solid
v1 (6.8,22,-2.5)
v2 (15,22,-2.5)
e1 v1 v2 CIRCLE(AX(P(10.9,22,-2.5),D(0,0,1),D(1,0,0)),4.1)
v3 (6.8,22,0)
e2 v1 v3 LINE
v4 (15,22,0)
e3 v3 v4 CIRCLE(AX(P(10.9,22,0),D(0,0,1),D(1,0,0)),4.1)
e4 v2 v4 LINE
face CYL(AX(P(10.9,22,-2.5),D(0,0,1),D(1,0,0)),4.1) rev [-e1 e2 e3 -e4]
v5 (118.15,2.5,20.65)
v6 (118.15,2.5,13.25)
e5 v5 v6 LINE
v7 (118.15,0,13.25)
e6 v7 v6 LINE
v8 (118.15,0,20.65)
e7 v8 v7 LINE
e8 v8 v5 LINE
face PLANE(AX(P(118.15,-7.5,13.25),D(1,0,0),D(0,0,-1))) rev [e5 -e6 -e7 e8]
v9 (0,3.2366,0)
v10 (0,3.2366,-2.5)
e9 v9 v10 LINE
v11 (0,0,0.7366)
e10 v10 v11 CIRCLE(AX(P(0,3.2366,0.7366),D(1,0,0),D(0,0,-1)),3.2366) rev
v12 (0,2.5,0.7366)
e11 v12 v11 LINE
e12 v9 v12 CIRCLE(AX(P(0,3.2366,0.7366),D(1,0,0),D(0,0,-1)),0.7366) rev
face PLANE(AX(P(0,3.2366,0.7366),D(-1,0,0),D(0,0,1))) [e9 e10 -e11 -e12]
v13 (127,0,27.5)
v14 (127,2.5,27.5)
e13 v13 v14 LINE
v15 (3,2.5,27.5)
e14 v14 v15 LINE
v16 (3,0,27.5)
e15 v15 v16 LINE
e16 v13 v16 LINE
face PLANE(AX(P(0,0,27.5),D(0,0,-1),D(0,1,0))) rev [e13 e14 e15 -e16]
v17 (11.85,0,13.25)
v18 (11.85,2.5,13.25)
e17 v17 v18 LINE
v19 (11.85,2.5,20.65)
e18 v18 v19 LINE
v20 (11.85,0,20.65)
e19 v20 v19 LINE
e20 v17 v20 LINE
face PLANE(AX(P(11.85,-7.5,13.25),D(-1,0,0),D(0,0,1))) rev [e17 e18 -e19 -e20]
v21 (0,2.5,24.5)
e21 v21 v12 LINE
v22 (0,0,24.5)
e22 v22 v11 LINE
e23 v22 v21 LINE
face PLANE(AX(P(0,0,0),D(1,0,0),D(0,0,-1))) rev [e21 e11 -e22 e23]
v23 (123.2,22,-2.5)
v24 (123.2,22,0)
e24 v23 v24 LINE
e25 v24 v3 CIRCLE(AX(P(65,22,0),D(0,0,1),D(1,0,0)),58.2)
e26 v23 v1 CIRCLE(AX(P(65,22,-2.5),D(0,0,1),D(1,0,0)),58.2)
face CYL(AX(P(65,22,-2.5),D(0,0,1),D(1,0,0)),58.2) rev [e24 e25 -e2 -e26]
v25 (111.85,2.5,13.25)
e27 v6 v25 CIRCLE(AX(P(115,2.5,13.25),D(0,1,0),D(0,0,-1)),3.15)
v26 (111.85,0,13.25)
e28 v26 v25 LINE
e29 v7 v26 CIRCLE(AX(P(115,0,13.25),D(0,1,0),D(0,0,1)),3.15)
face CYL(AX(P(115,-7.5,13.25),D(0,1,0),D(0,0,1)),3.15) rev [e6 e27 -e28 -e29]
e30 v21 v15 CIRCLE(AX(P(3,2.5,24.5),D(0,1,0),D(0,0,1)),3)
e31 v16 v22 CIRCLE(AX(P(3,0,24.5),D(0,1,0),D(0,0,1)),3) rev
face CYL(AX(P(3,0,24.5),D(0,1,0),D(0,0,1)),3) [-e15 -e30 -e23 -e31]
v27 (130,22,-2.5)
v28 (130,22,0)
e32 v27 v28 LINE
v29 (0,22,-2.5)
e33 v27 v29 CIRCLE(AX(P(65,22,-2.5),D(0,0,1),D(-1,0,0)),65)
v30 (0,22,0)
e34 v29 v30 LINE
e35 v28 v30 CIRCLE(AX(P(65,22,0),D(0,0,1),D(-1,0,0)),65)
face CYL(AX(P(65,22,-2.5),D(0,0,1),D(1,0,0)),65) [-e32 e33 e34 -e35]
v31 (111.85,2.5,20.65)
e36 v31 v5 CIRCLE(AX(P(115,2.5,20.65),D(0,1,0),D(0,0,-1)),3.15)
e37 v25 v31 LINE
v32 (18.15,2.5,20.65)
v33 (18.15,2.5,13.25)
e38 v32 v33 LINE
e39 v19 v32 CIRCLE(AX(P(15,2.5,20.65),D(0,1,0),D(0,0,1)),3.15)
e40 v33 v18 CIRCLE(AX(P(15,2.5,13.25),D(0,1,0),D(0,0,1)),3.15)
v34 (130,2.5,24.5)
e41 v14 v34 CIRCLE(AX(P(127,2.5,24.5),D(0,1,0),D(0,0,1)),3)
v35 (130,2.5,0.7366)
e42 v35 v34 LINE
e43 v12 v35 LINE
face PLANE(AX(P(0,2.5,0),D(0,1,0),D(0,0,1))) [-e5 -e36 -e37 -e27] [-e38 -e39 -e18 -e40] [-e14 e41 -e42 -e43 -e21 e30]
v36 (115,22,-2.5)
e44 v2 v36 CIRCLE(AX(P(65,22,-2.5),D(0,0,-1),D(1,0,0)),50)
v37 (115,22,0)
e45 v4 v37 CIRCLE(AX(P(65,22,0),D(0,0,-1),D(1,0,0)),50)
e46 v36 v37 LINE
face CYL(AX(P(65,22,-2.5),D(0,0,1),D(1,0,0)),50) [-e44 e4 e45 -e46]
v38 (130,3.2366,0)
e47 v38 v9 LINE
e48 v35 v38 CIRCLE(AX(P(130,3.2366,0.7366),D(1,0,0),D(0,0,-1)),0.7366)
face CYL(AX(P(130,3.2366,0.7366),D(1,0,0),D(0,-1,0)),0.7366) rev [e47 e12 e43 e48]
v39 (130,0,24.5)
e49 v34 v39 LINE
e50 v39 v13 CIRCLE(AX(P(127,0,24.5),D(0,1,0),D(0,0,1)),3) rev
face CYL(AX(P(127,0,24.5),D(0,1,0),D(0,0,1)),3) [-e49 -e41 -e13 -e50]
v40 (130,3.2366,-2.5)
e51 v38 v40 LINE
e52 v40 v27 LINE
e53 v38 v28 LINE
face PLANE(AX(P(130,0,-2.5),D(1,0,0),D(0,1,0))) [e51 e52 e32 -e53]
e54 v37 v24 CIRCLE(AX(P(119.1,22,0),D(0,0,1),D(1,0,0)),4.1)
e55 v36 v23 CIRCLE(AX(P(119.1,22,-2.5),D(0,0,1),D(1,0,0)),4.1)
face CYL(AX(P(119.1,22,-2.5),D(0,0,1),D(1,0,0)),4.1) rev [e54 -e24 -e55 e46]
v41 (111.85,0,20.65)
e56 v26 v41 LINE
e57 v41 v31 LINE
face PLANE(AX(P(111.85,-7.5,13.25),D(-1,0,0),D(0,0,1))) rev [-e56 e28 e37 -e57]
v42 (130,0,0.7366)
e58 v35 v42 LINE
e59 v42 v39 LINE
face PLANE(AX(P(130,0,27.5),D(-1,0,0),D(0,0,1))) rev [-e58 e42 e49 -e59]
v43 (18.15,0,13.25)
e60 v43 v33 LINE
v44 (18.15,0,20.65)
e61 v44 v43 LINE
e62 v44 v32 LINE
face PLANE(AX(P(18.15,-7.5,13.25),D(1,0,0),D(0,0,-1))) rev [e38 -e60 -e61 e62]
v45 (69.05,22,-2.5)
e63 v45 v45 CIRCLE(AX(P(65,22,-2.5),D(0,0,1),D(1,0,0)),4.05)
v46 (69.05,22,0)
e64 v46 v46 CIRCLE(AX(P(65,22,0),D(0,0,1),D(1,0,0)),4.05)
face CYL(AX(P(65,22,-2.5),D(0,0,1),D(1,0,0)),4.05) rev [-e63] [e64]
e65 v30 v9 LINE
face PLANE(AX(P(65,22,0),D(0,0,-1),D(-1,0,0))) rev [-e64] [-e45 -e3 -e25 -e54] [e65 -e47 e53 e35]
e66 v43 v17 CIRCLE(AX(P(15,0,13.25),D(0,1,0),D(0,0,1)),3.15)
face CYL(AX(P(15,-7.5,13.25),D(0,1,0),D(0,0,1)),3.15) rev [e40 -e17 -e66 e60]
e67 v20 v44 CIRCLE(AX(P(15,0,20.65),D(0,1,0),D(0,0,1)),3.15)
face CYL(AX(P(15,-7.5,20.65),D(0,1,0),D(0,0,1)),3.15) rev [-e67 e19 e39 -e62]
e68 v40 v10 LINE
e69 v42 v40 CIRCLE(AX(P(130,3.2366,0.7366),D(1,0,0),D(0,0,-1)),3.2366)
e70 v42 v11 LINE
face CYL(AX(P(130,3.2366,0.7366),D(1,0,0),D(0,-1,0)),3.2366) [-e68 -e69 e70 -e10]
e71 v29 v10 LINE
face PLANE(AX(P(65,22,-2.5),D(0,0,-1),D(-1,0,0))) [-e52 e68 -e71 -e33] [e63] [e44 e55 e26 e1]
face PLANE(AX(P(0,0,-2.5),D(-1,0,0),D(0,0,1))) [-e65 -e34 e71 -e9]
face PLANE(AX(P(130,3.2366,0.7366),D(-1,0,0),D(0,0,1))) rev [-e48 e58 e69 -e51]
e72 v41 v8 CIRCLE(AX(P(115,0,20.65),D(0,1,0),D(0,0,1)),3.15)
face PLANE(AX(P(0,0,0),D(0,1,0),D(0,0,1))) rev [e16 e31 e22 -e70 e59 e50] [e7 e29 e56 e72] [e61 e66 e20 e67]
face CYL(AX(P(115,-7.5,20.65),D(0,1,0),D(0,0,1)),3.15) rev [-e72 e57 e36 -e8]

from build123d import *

# Parameters (mm, degrees)
ESQUISSE1_R                           = 4.05
T_LE_DE_BASE_PLI_E1_DEPTH             = 2.5
T_LE_PLI_E_SUR_AR_TE1_STRIP_W         = 11.4732
T_LE_PLI_E_SUR_AR_TE1_STRIP_H         = 2.5
T_LE_PLI_E_SUR_AR_TE1_STRIP_CUT_DEPTH = 130
T_LE_PLI_E_SUR_AR_TE1_DEPTH           = 130
CONG_1_R                              = 3
ENL_V_MAT_EXTRU_1_DEPTH               = 10


# Sheet-metal steps are written as plain solids
with BuildPart() as part:
    # Esquisse1 → Tôle de base pliée1 (new body)
    with BuildSketch(Plane.XY):
        with BuildLine():
            Line((0, 0), (130, 0))
            Line((130, 0), (130, 22))
            ThreePointArc((130, 22), (65, 87), (0, 22))
            Line((0, 22), (0, 0))
        make_face()
        with Locations((65, 22)):
            Circle(ESQUISSE1_R, mode=Mode.SUBTRACT)
        with BuildLine():
            ThreePointArc((123.2, 22), (65, 80.2), (6.8, 22))
            ThreePointArc((6.8, 22), (10.9, 17.9), (15, 22))
            ThreePointArc((15, 22), (65, 72), (115, 22))
            ThreePointArc((115, 22), (119.1, 17.9), (123.2, 22))
        make_face(mode=Mode.SUBTRACT)
    extrude(amount=-T_LE_DE_BASE_PLI_E1_DEPTH)

    # Tôle pliée sur arête1 strip (across the edge) → Tôle pliée sur arête1 strip cut (cut)
    with BuildSketch(Plane.YZ):
        with Locations((-2.5, -1.25)):
            Rectangle(T_LE_PLI_E_SUR_AR_TE1_STRIP_W, T_LE_PLI_E_SUR_AR_TE1_STRIP_H)
    extrude(amount=T_LE_PLI_E_SUR_AR_TE1_STRIP_CUT_DEPTH, mode=Mode.SUBTRACT)

    # Tôle pliée sur arête1 section (across the edge) → Tôle pliée sur arête1 (add)
    with BuildSketch(Plane.YZ):
        with BuildLine():
            Line((0, 0.7366), (0, 27.5))
            Line((0, 27.5), (2.5, 27.5))
            Line((2.5, 27.5), (2.5, 0.7366))
            ThreePointArc((2.5, 0.7366), (2.715745145, 0.215745145), (3.2366, 0))
            Line((3.2366, 0), (3.2366, -2.5))
            ThreePointArc((3.2366, -2.5), (0.947978192, -1.552021808), (0, 0.7366))
        make_face()
    extrude(amount=T_LE_PLI_E_SUR_AR_TE1_DEPTH)

    # Congé1
    cong_1_edges = [part.edges().sort_by_distance(p)[0] for p in [
        (0, 1.25, 27.5),
        (130, 1.25, 27.5),
    ]]
    fillet(cong_1_edges, radius=CONG_1_R)

    # Esquisse9 → Enlèv. mat.-Extru.1 (cut)
    with BuildSketch(Plane(origin=(0, 2.5, 0), x_dir=(1, 0, 0), z_dir=(0, 1, 0))):
        with BuildLine():
            Line((18.15, -13.25), (18.15, -20.65))
            ThreePointArc((18.15, -20.65), (15, -23.8), (11.85, -20.65))
            Line((11.85, -20.65), (11.85, -13.25))
            ThreePointArc((11.85, -13.25), (15, -10.1), (18.15, -13.25))
        make_face()
        with BuildLine():
            Line((111.85, -13.25), (111.85, -20.65))
            ThreePointArc((111.85, -20.65), (115, -23.8), (118.15, -20.65))
            Line((118.15, -20.65), (118.15, -13.25))
            ThreePointArc((118.15, -13.25), (115, -10.1), (111.85, -13.25))
        make_face()
    extrude(amount=-ENL_V_MAT_EXTRU_1_DEPTH, mode=Mode.SUBTRACT)


solid = part.part
